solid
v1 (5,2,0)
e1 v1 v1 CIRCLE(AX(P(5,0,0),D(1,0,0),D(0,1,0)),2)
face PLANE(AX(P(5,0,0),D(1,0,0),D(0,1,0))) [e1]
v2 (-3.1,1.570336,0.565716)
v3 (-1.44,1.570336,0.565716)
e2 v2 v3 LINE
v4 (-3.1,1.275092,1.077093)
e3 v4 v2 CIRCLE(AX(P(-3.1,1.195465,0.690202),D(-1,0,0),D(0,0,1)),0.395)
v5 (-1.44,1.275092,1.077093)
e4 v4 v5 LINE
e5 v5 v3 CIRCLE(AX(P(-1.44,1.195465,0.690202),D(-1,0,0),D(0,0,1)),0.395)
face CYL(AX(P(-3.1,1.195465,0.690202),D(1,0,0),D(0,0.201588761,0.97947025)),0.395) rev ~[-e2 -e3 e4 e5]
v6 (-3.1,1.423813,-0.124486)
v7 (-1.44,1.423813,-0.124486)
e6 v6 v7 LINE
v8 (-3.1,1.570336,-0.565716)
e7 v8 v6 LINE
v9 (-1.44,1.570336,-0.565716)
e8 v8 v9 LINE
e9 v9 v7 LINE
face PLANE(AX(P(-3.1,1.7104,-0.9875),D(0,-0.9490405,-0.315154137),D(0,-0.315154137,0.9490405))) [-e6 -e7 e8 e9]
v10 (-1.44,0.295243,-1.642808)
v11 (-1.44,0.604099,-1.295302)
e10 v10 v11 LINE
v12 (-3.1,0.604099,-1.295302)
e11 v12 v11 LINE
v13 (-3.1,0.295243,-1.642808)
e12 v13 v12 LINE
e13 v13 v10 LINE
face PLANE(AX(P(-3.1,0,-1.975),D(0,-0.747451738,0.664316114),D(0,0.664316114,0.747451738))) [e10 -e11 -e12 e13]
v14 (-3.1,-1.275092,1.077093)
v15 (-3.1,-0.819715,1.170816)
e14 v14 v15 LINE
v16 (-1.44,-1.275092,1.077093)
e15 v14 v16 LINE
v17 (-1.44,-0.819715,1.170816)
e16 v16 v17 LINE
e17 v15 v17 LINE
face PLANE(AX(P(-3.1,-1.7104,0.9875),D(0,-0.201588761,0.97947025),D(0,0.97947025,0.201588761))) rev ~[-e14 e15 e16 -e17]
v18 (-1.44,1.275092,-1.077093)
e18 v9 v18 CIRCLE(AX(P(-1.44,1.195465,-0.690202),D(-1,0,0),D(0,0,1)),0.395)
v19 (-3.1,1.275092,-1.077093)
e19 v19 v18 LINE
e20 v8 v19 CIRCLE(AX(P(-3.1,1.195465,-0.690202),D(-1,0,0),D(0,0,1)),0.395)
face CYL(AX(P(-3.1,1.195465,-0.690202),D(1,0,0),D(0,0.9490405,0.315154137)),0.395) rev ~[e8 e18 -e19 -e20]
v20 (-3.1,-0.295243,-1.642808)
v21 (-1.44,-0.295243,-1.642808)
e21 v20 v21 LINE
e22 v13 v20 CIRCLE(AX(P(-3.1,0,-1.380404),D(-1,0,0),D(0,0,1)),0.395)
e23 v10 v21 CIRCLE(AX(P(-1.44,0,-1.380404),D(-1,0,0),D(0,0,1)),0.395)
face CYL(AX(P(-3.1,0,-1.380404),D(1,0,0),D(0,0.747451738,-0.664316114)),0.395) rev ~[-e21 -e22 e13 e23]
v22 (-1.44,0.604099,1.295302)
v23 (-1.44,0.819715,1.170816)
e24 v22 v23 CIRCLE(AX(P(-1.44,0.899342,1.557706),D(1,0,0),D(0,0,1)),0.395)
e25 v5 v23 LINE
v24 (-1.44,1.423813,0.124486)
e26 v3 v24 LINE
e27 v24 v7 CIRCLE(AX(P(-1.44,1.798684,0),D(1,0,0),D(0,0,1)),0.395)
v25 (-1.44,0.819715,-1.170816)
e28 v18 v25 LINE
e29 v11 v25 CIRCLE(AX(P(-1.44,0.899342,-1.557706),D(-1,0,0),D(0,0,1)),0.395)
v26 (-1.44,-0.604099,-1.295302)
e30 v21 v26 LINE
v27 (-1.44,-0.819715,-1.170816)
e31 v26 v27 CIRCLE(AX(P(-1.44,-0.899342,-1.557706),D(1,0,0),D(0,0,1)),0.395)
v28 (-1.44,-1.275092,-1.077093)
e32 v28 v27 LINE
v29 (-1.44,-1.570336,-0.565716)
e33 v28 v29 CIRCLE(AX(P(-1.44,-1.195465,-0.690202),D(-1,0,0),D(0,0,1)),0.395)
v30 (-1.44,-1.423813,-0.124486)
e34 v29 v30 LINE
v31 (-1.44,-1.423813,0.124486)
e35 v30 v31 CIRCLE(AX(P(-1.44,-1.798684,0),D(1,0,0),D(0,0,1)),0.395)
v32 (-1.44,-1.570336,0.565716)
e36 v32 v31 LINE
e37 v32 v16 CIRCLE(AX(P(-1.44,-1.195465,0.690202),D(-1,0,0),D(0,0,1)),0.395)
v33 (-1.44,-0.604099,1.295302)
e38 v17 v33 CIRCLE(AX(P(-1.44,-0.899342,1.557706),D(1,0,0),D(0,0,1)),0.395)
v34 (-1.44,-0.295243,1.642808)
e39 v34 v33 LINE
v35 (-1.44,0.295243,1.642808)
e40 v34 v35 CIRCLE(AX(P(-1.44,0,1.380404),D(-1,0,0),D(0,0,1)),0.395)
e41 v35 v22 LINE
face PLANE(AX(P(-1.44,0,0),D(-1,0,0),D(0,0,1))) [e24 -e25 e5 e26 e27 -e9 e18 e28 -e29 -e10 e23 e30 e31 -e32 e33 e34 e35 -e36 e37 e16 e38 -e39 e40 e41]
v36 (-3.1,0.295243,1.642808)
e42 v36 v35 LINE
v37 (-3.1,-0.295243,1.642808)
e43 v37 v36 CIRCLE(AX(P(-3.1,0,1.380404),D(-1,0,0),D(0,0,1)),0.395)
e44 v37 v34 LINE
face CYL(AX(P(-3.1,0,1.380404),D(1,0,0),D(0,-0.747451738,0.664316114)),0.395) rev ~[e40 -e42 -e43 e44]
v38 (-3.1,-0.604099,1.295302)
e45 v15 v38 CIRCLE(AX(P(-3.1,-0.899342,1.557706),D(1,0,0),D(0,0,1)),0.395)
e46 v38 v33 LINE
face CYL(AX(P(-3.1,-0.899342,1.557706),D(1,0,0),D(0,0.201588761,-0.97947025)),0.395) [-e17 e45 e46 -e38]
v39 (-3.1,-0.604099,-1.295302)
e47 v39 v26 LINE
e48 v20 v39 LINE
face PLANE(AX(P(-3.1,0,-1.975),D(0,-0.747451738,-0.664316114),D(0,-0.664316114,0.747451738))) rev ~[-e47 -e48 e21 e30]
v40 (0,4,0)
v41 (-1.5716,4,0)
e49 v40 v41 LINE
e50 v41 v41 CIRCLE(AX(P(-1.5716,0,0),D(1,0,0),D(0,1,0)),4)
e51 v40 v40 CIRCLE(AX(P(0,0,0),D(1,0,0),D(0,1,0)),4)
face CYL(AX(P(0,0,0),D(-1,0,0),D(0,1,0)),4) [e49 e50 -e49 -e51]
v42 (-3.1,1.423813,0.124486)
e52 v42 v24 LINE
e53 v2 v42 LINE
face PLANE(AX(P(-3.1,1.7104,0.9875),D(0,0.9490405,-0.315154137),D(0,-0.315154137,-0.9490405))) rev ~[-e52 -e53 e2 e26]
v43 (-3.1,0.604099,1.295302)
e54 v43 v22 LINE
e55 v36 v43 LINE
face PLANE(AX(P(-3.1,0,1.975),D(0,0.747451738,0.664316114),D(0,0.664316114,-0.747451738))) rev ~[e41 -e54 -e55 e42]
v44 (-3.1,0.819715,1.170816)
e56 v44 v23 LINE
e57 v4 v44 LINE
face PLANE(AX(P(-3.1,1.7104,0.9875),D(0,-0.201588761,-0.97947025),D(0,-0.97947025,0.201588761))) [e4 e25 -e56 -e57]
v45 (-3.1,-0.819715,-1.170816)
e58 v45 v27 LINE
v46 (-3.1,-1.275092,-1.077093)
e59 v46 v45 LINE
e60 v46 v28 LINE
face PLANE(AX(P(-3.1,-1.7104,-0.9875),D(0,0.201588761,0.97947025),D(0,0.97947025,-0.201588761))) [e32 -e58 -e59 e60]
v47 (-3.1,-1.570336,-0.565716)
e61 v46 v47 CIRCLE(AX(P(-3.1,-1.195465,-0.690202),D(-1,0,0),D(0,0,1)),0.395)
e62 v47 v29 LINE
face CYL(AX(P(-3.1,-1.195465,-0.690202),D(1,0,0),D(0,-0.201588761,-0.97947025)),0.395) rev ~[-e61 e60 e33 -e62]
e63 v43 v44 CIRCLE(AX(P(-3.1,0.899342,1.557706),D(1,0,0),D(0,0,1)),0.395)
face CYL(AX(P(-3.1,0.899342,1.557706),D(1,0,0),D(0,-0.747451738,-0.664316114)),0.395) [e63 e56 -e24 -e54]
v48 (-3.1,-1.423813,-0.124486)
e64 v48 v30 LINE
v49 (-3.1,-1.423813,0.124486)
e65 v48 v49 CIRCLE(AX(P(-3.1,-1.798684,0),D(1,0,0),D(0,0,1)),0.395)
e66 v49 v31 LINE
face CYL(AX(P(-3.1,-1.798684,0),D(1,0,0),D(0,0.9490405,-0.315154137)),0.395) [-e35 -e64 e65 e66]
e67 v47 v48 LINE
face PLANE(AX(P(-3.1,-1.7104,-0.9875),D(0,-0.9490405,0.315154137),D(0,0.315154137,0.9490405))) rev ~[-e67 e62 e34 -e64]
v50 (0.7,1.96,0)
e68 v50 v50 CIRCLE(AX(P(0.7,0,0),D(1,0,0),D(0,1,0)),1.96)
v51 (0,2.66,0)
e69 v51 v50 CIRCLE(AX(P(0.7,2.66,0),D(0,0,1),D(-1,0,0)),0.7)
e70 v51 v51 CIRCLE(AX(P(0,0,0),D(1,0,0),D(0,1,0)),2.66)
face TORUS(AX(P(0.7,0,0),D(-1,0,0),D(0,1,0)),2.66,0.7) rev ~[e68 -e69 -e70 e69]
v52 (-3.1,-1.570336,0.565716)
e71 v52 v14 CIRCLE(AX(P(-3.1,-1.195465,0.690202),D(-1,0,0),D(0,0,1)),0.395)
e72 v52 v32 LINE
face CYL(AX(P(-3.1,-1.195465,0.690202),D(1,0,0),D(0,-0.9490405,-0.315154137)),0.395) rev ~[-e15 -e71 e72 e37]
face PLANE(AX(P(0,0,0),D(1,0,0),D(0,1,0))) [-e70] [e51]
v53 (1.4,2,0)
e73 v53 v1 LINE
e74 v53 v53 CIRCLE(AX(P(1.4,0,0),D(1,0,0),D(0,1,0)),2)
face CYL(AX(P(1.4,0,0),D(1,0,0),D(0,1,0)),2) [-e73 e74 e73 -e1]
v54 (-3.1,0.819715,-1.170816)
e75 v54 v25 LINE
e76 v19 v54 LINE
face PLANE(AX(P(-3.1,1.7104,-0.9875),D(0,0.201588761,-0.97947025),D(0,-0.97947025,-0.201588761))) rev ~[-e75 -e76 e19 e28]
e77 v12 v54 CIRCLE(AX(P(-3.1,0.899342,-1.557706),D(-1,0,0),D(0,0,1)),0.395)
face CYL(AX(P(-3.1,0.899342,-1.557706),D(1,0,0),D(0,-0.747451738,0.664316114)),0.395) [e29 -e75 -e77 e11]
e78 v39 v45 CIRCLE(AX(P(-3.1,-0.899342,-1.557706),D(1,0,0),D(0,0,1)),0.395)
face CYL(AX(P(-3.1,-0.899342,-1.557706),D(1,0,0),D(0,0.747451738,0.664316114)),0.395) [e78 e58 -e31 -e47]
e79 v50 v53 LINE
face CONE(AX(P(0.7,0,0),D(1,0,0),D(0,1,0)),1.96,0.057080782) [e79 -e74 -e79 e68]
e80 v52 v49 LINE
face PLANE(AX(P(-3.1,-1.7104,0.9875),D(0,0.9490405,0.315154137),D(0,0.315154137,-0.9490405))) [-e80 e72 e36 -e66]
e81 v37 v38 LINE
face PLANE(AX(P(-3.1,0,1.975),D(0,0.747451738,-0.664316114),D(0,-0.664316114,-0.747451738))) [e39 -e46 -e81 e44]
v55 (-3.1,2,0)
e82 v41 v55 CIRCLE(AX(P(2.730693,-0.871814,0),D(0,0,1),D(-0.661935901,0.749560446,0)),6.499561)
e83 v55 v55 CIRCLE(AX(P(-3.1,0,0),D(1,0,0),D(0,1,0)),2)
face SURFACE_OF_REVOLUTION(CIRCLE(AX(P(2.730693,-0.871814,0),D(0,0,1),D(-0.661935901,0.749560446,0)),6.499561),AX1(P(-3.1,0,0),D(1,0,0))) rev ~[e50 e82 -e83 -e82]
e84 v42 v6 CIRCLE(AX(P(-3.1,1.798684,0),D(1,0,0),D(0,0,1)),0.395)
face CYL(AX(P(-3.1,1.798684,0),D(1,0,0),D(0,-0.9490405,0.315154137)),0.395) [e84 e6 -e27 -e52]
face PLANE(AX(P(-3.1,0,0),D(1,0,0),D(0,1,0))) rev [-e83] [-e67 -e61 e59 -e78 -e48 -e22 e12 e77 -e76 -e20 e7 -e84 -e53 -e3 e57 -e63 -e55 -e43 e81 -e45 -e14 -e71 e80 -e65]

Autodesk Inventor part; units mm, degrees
ref_plane "YZ Plane" through (0, 0, 0) normal (1, 0, 0) x (0, 1, 0)
ref_plane "XZ Plane" through (0, 0, 0) normal (0, 1, 0) x (-1, 0, 0)
ref_plane "XY Plane" through (0, 0, 0) normal (0, 0, 1) x (1, 0, 0)
sketch "Sketch4" plane through (0, 0, 0) normal (0, 0, 1) x (1, 0, 0)
  line L0 (-3.1, 0) -> (5, 0)
  line L1 (0, 0) -> (-3.1, 0)
  line L2 (0, 4) -> (0, 2.66)
  line L3 (0.7, 1.96) -> (0.7, 1.96)
  line L4 (0.7, 1.96) -> (1.4, 2)
  arc A0 (0, 2.66) -> (0.7, 1.96) centre (0.7, 2.66) ccw
  line L5 (-3.1, 0) -> (-3.1, 2)
  line L6 (0, 4) -> (-1.5716, 4)
  arc A1 (-1.5716, 4) -> (-3.1, 2) centre (2.731, -0.8721) ccw
  line L7 (1.4, 2) -> (5, 2)
  line L8 (5, 2) -> (5, 0)
  point P0 (0, 1.96)
  dimension "d71" = 0.7
  dimension "d72" = 5
  dimension "d74" = 0.7
  dimension "d75" = 3.92
  dimension "d78" = 4
  dimension "d82" = 6.5
  dimension "d83" = 3.1
  dimension "d84" = 8
  dimension "d104" = 3.6
  dimension "d105" = 4
revolve "Revolution7" add sketch "Sketch4" angle 360 about axis through (-3.1, 0, 0) along (1, 0, 0)
sketch "Sketch5" plane through (-3.1, 0, 0) normal (-1, 0, 0) x (0, 0, 1)
  circle A0 centre (0, 0) radius 1.975 construction
  circle A1 centre (0, 0) radius 1.3825 construction
  line L0 (0, 0) -> (-1.1973, 0.6912)
  line L1 (0, 0) -> (-1.1973, -0.6912)
  line L2 (-1.8008, 0) -> (1.7887, 0)
  line L3 (-1.975, 0) -> (-1.1973, -0.6912)
  line L4 (-1.975, 0) -> (-1.1973, 0.6912)
  point P0 (0, 0)
  dimension "d88" = 3.95
  dimension "d89" = 2.765
  dimension "d90" = 30
  dimension "d91" = 30
extrude "Extrusion1" cut sketch "Sketch5" against normal blind 1.66
pattern_circular "Circular Pattern1" count 6 over 360 about axis through (-10, 0, 0) along (1, 0, 0) of "Extrusion1"
fillet "Fillet1" radius 0.395 12 edges at (-2.27, -1.7104, -0.9875) (-2.27, -0.6912, -1.1973) (-2.27, -1.3825, 0) (-2.27, -1.7104, 0.9875) (-2.27, -0.6912, 1.1973) (-2.27, 0, 1.975) (-2.27, 1.3825, 0) (-2.27, 1.7104, 0.9875) (-2.27, 0.6913, 1.1973) (-2.27, 0.6912, -1.1973) (-2.27, 0, -1.975) (-2.27, 1.7104, -0.9875)
thread "Thread7" size "M4x0.7" class "6g" standard "ISO Metric profile" length 3.6
equation "\"a\" = 1.4"
equation "\"b\" = 3.6"
equation "\"dk\" = 8"
equation "\"k\" = 3.1"
equation "\"r\" = 0.7"
equation "\"rf\" = 6.5"
equation "\"x\" = 0.7"
equation "\"A_\" = 3.95"
equation "\"t\" = 1.66"
equation "\"p\" = 0.7"
equation "\"l_\" = 5"
equation "\"d\" = 4"
equation "\"ds_\" = 3.92"
equation "\"lg\" = 0"
properties part number "Flachkopfschraube mit Innenrund ISO 14583 - M4 x 5 - 4.8" material "Stahl"
